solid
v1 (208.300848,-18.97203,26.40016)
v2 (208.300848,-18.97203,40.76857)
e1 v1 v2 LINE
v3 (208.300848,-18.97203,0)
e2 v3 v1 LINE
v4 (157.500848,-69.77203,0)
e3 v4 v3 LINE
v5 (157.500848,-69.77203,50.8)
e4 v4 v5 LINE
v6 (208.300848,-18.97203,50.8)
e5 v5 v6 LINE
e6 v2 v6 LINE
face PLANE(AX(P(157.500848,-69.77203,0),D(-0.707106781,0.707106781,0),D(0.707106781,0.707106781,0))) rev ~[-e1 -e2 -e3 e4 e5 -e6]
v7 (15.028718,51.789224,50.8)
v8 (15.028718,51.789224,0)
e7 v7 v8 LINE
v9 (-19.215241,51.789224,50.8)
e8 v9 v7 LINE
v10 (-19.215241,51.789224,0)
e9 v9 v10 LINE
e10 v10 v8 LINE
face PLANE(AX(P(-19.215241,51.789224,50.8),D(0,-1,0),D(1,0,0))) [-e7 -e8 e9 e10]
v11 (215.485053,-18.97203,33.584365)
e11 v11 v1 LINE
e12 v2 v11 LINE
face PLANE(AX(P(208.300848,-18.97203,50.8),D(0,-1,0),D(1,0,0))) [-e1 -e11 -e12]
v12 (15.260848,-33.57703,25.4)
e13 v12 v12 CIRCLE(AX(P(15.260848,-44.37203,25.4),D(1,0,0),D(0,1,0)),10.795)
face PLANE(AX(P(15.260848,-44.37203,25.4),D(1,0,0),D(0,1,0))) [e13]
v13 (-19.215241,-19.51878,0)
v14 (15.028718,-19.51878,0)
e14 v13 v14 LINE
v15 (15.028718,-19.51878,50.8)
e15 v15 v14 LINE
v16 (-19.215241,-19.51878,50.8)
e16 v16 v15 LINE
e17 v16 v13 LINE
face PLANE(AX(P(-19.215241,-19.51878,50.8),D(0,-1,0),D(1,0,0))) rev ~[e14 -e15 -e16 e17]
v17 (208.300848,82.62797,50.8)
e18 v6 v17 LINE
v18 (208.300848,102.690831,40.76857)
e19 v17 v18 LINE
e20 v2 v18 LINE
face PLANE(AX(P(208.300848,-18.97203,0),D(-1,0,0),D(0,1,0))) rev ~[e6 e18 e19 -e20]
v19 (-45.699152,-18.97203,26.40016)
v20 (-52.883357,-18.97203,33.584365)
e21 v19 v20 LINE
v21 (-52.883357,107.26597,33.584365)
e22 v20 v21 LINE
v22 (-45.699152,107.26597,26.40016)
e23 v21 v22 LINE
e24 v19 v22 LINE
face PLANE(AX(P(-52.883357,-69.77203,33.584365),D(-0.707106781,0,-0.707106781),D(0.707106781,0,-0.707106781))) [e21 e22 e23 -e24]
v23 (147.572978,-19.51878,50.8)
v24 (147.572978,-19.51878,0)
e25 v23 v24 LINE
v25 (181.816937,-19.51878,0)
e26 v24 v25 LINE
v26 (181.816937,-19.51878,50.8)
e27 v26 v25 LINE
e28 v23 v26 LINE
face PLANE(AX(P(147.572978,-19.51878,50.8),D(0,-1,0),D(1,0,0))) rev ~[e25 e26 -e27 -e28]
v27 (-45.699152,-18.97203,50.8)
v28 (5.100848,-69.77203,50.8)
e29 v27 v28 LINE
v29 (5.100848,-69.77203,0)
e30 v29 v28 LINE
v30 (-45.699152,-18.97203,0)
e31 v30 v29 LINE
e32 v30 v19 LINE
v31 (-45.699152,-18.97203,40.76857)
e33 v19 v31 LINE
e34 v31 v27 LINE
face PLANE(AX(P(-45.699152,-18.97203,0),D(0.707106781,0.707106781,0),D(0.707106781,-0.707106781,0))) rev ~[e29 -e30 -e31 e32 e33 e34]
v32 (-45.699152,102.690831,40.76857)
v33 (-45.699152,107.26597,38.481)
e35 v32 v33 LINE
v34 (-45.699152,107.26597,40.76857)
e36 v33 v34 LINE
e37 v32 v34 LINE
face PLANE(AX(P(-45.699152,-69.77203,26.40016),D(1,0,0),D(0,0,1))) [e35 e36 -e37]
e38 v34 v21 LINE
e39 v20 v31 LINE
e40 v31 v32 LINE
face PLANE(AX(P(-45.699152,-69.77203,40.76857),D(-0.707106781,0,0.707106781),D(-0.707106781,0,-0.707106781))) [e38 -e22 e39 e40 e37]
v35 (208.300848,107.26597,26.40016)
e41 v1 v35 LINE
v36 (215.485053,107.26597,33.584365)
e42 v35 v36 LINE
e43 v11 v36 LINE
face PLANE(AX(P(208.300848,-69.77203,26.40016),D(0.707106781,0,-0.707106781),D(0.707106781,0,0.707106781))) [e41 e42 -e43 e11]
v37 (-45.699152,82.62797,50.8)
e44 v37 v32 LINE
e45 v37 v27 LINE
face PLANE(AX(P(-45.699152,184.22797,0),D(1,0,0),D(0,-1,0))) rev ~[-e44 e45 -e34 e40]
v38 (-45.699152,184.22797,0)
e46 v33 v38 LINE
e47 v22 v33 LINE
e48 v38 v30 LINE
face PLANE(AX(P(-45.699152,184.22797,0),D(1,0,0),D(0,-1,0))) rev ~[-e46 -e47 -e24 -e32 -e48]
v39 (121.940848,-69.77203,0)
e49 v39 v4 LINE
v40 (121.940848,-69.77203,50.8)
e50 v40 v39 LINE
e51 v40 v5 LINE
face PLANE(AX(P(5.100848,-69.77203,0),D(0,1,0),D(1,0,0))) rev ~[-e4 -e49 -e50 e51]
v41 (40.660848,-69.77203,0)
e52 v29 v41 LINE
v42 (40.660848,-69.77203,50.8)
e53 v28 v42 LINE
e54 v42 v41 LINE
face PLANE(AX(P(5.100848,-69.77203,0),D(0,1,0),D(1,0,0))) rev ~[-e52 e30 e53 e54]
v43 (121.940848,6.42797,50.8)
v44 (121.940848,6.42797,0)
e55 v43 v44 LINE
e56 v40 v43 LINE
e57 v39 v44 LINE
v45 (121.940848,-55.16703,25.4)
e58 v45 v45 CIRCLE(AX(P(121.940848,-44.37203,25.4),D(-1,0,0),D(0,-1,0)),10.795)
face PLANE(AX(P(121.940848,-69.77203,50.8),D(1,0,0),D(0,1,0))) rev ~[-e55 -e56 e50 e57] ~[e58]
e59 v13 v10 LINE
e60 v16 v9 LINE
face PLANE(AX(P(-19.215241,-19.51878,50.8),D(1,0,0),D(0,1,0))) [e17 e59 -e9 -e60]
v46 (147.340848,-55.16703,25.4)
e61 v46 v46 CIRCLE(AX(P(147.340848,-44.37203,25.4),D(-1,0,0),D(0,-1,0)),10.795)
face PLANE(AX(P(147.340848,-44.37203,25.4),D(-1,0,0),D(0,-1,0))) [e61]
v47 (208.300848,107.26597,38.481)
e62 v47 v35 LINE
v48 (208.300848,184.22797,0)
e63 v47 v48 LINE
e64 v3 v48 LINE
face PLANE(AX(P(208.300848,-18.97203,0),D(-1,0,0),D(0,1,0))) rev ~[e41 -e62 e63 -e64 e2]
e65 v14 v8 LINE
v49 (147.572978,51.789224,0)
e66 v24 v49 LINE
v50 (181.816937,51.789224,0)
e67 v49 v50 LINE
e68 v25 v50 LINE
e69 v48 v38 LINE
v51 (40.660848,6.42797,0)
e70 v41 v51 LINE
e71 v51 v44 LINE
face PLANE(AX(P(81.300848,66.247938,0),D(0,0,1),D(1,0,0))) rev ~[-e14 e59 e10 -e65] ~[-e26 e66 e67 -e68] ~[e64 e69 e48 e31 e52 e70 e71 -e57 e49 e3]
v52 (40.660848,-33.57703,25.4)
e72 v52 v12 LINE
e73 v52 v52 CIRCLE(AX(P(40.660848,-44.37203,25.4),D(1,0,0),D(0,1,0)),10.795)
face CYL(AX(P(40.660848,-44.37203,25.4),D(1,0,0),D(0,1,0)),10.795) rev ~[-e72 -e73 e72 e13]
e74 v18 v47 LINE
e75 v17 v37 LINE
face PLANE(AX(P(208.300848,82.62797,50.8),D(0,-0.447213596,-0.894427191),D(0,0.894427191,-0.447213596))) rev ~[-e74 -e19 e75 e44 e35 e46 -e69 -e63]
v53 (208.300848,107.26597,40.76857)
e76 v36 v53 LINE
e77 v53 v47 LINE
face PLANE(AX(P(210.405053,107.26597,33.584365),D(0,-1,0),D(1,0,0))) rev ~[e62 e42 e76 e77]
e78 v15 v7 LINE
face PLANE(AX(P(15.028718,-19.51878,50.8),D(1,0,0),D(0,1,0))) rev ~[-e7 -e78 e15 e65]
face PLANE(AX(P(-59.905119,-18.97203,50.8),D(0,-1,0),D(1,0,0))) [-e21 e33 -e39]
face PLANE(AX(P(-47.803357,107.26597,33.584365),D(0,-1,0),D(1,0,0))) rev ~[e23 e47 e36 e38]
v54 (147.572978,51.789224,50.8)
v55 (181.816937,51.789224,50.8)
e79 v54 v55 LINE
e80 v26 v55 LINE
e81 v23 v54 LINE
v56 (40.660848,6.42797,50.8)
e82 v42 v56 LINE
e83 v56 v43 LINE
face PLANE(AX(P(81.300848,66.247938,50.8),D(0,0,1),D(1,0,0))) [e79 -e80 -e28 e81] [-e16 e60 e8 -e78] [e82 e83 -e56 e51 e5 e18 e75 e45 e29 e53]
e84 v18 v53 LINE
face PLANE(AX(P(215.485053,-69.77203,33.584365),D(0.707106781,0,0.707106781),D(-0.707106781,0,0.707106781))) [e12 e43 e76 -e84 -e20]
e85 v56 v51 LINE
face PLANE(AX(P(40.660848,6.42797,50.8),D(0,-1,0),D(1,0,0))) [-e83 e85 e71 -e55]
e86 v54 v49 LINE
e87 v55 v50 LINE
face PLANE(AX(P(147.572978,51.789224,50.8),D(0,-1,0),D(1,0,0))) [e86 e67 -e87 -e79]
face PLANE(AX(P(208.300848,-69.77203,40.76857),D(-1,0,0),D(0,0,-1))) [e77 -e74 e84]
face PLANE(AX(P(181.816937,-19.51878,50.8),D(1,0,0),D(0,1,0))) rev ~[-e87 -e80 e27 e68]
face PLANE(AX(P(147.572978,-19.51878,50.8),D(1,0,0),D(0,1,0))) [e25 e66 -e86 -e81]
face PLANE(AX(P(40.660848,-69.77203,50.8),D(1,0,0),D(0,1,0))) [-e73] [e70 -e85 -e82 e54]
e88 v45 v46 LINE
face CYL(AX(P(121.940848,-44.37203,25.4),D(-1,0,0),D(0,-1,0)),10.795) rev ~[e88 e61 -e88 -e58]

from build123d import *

# Parameters (mm, degrees)
F1_DEPTH  = 50.8
F3_DEPTH  = 254.001
F4_W      = 81.28
F4_H      = 76.2
F5_DEPTH  = 50.801
F7_DEPTH  = 177.038
F8_W      = 14.2059672672
F8_H      = 54.5313454777
F8_W_2    = 25.0834482712
F8_H_2    = 56.1428241044
F9_DEPTH  = 50.801
F10_W     = 34.2439590022
F10_H     = 71.3080037385
F11_DEPTH = 50.801
F12_R     = 10.795
F13_DEPTH = 25.4
F14_R     = 10.795
F15_DEPTH = 25.4


# Not quite as in the source:
# - a feature names something its author has since deleted; it is built from what else it names


with BuildPart() as f1:
    # F0 (on Top) → F1 (new body)
    with BuildSketch(Plane.XY):
        Polygon((208.3008480269, 184.2279704243), (-45.6991519731, 184.2279704243), (-45.6991519731, -18.9720295757), (5.1008480269, -69.7720295757), (157.5008480269, -69.7720295757), (208.3008480269, -18.9720295757), align=None)
    extrude(amount=F1_DEPTH)

    # F2 (on face) → F3 (cut, through all)
    with BuildSketch(Plane.YZ.offset(208.3008480269)):
        Polygon((82.6279704243, 50.8), (184.2279704243, 0), (184.2279704243, 50.8), align=None)
    extrude(amount=-F3_DEPTH, mode=Mode.SUBTRACT)

    # F4 (on face) → F5 (cut, through all)
    with BuildSketch(Plane.XY.offset(50.8)):
        with Locations((81.3008480269, -31.6720295757)):
            Rectangle(F4_W, F4_H)
    extrude(amount=-F5_DEPTH, mode=Mode.SUBTRACT)

    # F6 (on face) → F7 (join)
    with BuildSketch(Plane.XZ.offset(69.7720295757)):
        Polygon((-52.88335687, 33.5843649413), (-45.6991519731, 26.4001600444), (-45.6991519731, 40.7685698381), align=None)
        Polygon((208.3008480269, 26.4001600444), (215.4850529237, 33.5843649413), (208.3008480269, 40.7685698381), align=None)
    extrude(amount=-F7_DEPTH)

    # F8 (on face) → F9 (cut, through all)
    with BuildSketch(Plane.XY.offset(50.8)):
        with Locations((-52.8021356067, -46.2377023146)):
            Rectangle(F8_W, F8_H)
        with Locations((220.8425721625, -47.0434416279)):
            Rectangle(F8_W_2, F8_H_2)
    extrude(amount=-F9_DEPTH, mode=Mode.SUBTRACT)

    # F10 (on face) → F11 (cut, through all)
    with BuildSketch(Plane.XY.offset(50.8)):
        with Locations((-2.0932615735, 16.1352222785)):
            Rectangle(F10_W, F10_H)
        with Locations((164.6949576272, 16.1352222785)):
            Rectangle(F10_W, F10_H)
    extrude(amount=-F11_DEPTH, mode=Mode.SUBTRACT)

    # F12 (on face) → F13 (cut)
    with BuildSketch(Plane.YZ.offset(40.6608480269)):
        with Locations((-44.3720295757, 25.4)):
            Circle(F12_R)
    extrude(amount=-F13_DEPTH, mode=Mode.SUBTRACT)

    # F14 (on face) → F15 (cut)
    with BuildSketch(Plane(origin=(121.9408480269, 0, 0), x_dir=(0, -1, 0), z_dir=(-1, 0, 0))):
        with Locations((44.3720295757, 25.4)):
            Circle(F14_R)
    extrude(amount=-F15_DEPTH, mode=Mode.SUBTRACT)


solid = f1.part
